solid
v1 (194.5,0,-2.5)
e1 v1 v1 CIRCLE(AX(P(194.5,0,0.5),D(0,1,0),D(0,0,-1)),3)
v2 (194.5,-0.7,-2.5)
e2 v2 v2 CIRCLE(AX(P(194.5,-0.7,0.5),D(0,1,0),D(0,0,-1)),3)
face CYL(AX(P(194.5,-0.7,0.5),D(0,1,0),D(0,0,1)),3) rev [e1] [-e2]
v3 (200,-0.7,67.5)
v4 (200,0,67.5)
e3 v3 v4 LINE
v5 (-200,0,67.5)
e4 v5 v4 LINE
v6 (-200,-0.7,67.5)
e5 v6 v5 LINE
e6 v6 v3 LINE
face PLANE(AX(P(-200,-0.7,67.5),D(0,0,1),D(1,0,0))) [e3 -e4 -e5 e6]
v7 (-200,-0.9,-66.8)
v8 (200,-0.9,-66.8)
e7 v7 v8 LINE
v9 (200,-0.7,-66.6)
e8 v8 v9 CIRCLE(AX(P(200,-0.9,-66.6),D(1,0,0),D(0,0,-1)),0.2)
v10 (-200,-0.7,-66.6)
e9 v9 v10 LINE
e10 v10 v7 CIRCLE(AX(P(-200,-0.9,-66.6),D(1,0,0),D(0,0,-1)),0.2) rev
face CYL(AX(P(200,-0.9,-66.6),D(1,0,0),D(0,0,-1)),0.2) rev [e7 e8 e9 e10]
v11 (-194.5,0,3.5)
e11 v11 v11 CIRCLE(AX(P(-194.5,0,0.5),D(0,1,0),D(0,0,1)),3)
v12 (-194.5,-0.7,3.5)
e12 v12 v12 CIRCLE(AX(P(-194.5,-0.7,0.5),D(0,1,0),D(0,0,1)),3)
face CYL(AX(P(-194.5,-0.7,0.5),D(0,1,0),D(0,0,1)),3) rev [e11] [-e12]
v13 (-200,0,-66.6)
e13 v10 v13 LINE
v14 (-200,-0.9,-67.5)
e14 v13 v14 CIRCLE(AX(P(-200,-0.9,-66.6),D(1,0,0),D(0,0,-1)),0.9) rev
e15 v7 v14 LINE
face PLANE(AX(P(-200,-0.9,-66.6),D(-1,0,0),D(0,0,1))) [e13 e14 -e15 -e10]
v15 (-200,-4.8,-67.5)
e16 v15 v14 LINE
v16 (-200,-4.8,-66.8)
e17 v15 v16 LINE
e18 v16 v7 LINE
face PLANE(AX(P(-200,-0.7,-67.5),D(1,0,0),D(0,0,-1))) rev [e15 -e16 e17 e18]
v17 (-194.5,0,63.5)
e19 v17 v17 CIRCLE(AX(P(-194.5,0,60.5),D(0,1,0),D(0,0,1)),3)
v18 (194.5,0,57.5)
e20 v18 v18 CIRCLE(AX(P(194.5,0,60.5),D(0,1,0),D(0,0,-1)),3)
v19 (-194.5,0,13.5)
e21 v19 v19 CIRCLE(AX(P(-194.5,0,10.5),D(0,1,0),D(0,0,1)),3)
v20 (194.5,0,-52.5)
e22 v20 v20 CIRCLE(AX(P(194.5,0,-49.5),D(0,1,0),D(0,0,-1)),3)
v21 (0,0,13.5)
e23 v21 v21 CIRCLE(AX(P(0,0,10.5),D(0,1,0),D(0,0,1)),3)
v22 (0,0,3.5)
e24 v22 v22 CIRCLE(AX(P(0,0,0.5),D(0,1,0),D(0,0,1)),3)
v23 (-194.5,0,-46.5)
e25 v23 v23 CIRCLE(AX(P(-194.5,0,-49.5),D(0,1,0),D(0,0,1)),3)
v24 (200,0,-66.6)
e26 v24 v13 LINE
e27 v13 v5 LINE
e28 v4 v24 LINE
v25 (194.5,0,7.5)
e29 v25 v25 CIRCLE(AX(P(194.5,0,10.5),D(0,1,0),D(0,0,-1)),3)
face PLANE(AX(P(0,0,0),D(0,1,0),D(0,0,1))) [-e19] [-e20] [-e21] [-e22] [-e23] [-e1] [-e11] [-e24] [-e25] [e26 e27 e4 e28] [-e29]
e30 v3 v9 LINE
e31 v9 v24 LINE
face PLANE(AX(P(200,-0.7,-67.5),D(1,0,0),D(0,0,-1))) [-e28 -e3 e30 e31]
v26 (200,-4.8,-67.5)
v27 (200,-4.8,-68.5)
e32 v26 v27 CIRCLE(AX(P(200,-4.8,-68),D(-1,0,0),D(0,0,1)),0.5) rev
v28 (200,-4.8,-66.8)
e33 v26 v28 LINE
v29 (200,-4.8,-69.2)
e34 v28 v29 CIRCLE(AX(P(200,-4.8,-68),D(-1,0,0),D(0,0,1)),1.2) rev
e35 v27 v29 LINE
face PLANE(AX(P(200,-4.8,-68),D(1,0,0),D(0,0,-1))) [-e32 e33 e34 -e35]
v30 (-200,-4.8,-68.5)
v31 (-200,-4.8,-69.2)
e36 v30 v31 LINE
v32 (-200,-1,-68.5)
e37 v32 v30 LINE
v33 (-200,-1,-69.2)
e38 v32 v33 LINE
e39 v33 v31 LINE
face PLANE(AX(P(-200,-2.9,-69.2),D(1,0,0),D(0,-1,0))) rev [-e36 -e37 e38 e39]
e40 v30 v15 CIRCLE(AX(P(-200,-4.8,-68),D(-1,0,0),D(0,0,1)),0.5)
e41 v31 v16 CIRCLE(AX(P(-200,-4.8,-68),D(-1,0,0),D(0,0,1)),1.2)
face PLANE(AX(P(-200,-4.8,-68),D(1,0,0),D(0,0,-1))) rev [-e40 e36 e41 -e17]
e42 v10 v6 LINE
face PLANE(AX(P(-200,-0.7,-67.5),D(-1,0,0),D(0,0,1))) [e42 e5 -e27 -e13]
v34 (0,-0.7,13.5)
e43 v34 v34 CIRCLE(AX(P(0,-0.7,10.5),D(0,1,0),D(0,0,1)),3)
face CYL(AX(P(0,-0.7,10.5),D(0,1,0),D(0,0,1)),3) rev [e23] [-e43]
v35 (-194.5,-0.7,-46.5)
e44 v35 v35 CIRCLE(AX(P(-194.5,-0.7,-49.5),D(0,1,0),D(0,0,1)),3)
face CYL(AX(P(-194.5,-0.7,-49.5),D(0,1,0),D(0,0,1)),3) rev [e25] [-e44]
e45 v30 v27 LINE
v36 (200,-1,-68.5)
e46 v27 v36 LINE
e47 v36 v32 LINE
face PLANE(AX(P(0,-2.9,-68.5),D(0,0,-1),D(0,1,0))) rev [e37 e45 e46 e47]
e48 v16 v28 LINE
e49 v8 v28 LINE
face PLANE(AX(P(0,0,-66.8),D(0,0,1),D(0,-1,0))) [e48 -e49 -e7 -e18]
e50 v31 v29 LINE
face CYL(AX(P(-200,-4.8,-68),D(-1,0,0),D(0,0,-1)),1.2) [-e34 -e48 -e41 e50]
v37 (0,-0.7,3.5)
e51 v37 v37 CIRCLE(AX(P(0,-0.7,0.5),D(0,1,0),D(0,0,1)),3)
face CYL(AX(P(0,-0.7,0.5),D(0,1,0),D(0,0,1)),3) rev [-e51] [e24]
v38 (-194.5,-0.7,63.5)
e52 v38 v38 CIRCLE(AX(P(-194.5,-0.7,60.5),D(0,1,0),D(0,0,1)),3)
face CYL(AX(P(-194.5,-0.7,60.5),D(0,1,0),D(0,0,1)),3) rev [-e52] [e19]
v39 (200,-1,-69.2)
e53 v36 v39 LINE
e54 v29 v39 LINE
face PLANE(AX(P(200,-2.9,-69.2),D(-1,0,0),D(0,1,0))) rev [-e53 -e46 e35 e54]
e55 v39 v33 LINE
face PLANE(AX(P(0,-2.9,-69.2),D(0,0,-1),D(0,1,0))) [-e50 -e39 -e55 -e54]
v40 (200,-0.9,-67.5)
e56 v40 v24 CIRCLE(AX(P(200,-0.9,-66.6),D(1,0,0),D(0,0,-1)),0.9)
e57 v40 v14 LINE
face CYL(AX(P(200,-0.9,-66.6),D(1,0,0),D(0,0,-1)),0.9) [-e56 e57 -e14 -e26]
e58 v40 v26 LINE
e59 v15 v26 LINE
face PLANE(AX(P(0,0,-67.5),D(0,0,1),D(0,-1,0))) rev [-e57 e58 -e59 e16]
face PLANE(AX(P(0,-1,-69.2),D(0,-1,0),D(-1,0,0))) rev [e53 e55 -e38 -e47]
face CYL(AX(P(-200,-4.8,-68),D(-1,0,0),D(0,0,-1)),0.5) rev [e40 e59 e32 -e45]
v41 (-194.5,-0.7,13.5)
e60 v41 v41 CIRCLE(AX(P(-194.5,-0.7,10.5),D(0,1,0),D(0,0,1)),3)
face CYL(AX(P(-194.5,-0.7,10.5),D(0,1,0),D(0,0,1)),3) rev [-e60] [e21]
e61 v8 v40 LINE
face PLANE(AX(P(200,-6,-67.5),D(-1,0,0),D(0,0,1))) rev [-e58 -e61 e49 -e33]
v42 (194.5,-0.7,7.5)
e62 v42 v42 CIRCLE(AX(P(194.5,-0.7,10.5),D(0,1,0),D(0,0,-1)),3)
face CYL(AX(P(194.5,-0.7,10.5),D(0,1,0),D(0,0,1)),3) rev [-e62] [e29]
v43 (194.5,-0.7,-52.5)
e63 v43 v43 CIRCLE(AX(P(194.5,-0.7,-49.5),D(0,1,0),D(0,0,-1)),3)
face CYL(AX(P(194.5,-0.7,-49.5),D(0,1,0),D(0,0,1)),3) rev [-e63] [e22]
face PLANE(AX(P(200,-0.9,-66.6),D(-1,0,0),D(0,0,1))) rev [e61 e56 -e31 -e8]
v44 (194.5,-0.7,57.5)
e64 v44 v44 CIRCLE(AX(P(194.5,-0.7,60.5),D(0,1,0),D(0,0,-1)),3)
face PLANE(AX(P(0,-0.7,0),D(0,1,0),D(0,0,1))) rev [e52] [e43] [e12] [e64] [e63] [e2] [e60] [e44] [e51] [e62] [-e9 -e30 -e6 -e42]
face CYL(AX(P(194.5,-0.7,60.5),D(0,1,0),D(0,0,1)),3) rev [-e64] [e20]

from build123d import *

# Parameters (mm, degrees)
SKETCH_1_W                       = 400
SKETCH_1_H                       = 135
SKETCH_1_R                       = 3
SM_BASE_FLANGE_1_DEPTH           = 0.7
SM_EDGE_FLANGE_1_STRIP_W         = 3.2
SM_EDGE_FLANGE_1_STRIP_H         = 0.7
SM_EDGE_FLANGE_1_STRIP_CUT_DEPTH = 400
SM_EDGE_FLANGE_1_DEPTH           = 400
OTHER_START                      = -200
OTHER_1_DEPTH                    = 400
OTHER_1_2_DEPTH                  = 400


# Read off the part's stored shape, not the designer's step: 褶边1
# Sheet-metal steps are written as plain solids
with BuildPart() as part:
    # Sketch 1 → 基体-法兰1 (new body)
    with BuildSketch(Plane(origin=(0, 0, 0), x_dir=(1, 0, 0), z_dir=(0, 1, 0))):
        Rectangle(SKETCH_1_W, SKETCH_1_H)
        with Locations(Location((-194.5, -60.5, 0), (0, 0, 270))):
            Circle(SKETCH_1_R, mode=Mode.SUBTRACT)
        with Locations(Location((-194.5, -10.5, 0), (0, 0, 270))):
            Circle(SKETCH_1_R, mode=Mode.SUBTRACT)
        with Locations(Location((-194.5, -0.5, 0), (0, 0, 270))):
            Circle(SKETCH_1_R, mode=Mode.SUBTRACT)
        with Locations(Location((-194.5, 49.5, 0), (0, 0, 270))):
            Circle(SKETCH_1_R, mode=Mode.SUBTRACT)
        with Locations(Location((0, -10.5, 0), (0, 0, 270))):
            Circle(SKETCH_1_R, mode=Mode.SUBTRACT)
        with Locations(Location((0, -0.5, 0), (0, 0, 270))):
            Circle(SKETCH_1_R, mode=Mode.SUBTRACT)
        with Locations(Location((194.5, -60.5, 0), (0, 0, 90))):
            Circle(SKETCH_1_R, mode=Mode.SUBTRACT)
        with Locations(Location((194.5, -10.5, 0), (0, 0, 90))):
            Circle(SKETCH_1_R, mode=Mode.SUBTRACT)
        with Locations(Location((194.5, -0.5, 0), (0, 0, 90))):
            Circle(SKETCH_1_R, mode=Mode.SUBTRACT)
        with Locations(Location((194.5, 49.5, 0), (0, 0, 90))):
            Circle(SKETCH_1_R, mode=Mode.SUBTRACT)
    extrude(amount=-SM_BASE_FLANGE_1_DEPTH)

    # 边线-法兰1 strip (across the edge) → 边线-法兰1 strip cut (cut)
    with BuildSketch(Plane(origin=(-200, -0.7, -67.5), x_dir=(0, 0, 1), z_dir=(1, 0, 0))):
        with Locations((-0.7, -0.35)):
            Rectangle(SM_EDGE_FLANGE_1_STRIP_W, SM_EDGE_FLANGE_1_STRIP_H)
    extrude(amount=SM_EDGE_FLANGE_1_STRIP_CUT_DEPTH, mode=Mode.SUBTRACT)

    # 边线-法兰1 section (across the edge) → 边线-法兰1 (add)
    with BuildSketch(Plane(origin=(-200, -0.7, -67.5), x_dir=(0, 0, 1), z_dir=(1, 0, 0))):
        with BuildLine():
            Line((0, 0.2), (0, 5.3))
            Line((0, 5.3), (0.7, 5.3))
            Line((0.7, 5.3), (0.7, 0.2))
            ThreePointArc((0.7, 0.2), (0.758578644, 0.058578644), (0.9, 0))
            Line((0.9, 0), (0.9, -0.7))
            ThreePointArc((0.9, -0.7), (0.263603897, -0.436396103), (0, 0.2))
        make_face()
    extrude(amount=SM_EDGE_FLANGE_1_DEPTH)

    # Other 1 outline → Other 1 (cut)
    with BuildSketch(Plane.YZ.offset(OTHER_START)):
        with BuildLine():
            Line((-6, -67.5), (-5.890871211, -67.5))
            ThreePointArc((-5.890871211, -67.5), (-5.44807407, -66.990049506), (-4.8, -66.8))
            Line((-4.8, -66.8), (-6, -66.8))
            Line((-6, -66.8), (-6, -67.5))
        make_face()
    extrude(amount=OTHER_1_DEPTH, mode=Mode.SUBTRACT)

    # Other 1 2 outline → Other 1 2 (add)
    with BuildSketch(Plane.YZ.offset(OTHER_START)):
        with BuildLine():
            Line((-1, -69.2), (-1, -68.5))
            Line((-1, -68.5), (-4.8, -68.5))
            ThreePointArc((-4.8, -68.5), (-5.3, -68), (-4.8, -67.5))
            Line((-4.8, -67.5), (-5.890871211, -67.5))
            ThreePointArc((-5.890871211, -67.5), (-5.809950494, -68.64807407), (-4.8, -69.2))
            Line((-4.8, -69.2), (-1, -69.2))
        make_face()
    extrude(amount=OTHER_1_2_DEPTH)


solid = part.part
